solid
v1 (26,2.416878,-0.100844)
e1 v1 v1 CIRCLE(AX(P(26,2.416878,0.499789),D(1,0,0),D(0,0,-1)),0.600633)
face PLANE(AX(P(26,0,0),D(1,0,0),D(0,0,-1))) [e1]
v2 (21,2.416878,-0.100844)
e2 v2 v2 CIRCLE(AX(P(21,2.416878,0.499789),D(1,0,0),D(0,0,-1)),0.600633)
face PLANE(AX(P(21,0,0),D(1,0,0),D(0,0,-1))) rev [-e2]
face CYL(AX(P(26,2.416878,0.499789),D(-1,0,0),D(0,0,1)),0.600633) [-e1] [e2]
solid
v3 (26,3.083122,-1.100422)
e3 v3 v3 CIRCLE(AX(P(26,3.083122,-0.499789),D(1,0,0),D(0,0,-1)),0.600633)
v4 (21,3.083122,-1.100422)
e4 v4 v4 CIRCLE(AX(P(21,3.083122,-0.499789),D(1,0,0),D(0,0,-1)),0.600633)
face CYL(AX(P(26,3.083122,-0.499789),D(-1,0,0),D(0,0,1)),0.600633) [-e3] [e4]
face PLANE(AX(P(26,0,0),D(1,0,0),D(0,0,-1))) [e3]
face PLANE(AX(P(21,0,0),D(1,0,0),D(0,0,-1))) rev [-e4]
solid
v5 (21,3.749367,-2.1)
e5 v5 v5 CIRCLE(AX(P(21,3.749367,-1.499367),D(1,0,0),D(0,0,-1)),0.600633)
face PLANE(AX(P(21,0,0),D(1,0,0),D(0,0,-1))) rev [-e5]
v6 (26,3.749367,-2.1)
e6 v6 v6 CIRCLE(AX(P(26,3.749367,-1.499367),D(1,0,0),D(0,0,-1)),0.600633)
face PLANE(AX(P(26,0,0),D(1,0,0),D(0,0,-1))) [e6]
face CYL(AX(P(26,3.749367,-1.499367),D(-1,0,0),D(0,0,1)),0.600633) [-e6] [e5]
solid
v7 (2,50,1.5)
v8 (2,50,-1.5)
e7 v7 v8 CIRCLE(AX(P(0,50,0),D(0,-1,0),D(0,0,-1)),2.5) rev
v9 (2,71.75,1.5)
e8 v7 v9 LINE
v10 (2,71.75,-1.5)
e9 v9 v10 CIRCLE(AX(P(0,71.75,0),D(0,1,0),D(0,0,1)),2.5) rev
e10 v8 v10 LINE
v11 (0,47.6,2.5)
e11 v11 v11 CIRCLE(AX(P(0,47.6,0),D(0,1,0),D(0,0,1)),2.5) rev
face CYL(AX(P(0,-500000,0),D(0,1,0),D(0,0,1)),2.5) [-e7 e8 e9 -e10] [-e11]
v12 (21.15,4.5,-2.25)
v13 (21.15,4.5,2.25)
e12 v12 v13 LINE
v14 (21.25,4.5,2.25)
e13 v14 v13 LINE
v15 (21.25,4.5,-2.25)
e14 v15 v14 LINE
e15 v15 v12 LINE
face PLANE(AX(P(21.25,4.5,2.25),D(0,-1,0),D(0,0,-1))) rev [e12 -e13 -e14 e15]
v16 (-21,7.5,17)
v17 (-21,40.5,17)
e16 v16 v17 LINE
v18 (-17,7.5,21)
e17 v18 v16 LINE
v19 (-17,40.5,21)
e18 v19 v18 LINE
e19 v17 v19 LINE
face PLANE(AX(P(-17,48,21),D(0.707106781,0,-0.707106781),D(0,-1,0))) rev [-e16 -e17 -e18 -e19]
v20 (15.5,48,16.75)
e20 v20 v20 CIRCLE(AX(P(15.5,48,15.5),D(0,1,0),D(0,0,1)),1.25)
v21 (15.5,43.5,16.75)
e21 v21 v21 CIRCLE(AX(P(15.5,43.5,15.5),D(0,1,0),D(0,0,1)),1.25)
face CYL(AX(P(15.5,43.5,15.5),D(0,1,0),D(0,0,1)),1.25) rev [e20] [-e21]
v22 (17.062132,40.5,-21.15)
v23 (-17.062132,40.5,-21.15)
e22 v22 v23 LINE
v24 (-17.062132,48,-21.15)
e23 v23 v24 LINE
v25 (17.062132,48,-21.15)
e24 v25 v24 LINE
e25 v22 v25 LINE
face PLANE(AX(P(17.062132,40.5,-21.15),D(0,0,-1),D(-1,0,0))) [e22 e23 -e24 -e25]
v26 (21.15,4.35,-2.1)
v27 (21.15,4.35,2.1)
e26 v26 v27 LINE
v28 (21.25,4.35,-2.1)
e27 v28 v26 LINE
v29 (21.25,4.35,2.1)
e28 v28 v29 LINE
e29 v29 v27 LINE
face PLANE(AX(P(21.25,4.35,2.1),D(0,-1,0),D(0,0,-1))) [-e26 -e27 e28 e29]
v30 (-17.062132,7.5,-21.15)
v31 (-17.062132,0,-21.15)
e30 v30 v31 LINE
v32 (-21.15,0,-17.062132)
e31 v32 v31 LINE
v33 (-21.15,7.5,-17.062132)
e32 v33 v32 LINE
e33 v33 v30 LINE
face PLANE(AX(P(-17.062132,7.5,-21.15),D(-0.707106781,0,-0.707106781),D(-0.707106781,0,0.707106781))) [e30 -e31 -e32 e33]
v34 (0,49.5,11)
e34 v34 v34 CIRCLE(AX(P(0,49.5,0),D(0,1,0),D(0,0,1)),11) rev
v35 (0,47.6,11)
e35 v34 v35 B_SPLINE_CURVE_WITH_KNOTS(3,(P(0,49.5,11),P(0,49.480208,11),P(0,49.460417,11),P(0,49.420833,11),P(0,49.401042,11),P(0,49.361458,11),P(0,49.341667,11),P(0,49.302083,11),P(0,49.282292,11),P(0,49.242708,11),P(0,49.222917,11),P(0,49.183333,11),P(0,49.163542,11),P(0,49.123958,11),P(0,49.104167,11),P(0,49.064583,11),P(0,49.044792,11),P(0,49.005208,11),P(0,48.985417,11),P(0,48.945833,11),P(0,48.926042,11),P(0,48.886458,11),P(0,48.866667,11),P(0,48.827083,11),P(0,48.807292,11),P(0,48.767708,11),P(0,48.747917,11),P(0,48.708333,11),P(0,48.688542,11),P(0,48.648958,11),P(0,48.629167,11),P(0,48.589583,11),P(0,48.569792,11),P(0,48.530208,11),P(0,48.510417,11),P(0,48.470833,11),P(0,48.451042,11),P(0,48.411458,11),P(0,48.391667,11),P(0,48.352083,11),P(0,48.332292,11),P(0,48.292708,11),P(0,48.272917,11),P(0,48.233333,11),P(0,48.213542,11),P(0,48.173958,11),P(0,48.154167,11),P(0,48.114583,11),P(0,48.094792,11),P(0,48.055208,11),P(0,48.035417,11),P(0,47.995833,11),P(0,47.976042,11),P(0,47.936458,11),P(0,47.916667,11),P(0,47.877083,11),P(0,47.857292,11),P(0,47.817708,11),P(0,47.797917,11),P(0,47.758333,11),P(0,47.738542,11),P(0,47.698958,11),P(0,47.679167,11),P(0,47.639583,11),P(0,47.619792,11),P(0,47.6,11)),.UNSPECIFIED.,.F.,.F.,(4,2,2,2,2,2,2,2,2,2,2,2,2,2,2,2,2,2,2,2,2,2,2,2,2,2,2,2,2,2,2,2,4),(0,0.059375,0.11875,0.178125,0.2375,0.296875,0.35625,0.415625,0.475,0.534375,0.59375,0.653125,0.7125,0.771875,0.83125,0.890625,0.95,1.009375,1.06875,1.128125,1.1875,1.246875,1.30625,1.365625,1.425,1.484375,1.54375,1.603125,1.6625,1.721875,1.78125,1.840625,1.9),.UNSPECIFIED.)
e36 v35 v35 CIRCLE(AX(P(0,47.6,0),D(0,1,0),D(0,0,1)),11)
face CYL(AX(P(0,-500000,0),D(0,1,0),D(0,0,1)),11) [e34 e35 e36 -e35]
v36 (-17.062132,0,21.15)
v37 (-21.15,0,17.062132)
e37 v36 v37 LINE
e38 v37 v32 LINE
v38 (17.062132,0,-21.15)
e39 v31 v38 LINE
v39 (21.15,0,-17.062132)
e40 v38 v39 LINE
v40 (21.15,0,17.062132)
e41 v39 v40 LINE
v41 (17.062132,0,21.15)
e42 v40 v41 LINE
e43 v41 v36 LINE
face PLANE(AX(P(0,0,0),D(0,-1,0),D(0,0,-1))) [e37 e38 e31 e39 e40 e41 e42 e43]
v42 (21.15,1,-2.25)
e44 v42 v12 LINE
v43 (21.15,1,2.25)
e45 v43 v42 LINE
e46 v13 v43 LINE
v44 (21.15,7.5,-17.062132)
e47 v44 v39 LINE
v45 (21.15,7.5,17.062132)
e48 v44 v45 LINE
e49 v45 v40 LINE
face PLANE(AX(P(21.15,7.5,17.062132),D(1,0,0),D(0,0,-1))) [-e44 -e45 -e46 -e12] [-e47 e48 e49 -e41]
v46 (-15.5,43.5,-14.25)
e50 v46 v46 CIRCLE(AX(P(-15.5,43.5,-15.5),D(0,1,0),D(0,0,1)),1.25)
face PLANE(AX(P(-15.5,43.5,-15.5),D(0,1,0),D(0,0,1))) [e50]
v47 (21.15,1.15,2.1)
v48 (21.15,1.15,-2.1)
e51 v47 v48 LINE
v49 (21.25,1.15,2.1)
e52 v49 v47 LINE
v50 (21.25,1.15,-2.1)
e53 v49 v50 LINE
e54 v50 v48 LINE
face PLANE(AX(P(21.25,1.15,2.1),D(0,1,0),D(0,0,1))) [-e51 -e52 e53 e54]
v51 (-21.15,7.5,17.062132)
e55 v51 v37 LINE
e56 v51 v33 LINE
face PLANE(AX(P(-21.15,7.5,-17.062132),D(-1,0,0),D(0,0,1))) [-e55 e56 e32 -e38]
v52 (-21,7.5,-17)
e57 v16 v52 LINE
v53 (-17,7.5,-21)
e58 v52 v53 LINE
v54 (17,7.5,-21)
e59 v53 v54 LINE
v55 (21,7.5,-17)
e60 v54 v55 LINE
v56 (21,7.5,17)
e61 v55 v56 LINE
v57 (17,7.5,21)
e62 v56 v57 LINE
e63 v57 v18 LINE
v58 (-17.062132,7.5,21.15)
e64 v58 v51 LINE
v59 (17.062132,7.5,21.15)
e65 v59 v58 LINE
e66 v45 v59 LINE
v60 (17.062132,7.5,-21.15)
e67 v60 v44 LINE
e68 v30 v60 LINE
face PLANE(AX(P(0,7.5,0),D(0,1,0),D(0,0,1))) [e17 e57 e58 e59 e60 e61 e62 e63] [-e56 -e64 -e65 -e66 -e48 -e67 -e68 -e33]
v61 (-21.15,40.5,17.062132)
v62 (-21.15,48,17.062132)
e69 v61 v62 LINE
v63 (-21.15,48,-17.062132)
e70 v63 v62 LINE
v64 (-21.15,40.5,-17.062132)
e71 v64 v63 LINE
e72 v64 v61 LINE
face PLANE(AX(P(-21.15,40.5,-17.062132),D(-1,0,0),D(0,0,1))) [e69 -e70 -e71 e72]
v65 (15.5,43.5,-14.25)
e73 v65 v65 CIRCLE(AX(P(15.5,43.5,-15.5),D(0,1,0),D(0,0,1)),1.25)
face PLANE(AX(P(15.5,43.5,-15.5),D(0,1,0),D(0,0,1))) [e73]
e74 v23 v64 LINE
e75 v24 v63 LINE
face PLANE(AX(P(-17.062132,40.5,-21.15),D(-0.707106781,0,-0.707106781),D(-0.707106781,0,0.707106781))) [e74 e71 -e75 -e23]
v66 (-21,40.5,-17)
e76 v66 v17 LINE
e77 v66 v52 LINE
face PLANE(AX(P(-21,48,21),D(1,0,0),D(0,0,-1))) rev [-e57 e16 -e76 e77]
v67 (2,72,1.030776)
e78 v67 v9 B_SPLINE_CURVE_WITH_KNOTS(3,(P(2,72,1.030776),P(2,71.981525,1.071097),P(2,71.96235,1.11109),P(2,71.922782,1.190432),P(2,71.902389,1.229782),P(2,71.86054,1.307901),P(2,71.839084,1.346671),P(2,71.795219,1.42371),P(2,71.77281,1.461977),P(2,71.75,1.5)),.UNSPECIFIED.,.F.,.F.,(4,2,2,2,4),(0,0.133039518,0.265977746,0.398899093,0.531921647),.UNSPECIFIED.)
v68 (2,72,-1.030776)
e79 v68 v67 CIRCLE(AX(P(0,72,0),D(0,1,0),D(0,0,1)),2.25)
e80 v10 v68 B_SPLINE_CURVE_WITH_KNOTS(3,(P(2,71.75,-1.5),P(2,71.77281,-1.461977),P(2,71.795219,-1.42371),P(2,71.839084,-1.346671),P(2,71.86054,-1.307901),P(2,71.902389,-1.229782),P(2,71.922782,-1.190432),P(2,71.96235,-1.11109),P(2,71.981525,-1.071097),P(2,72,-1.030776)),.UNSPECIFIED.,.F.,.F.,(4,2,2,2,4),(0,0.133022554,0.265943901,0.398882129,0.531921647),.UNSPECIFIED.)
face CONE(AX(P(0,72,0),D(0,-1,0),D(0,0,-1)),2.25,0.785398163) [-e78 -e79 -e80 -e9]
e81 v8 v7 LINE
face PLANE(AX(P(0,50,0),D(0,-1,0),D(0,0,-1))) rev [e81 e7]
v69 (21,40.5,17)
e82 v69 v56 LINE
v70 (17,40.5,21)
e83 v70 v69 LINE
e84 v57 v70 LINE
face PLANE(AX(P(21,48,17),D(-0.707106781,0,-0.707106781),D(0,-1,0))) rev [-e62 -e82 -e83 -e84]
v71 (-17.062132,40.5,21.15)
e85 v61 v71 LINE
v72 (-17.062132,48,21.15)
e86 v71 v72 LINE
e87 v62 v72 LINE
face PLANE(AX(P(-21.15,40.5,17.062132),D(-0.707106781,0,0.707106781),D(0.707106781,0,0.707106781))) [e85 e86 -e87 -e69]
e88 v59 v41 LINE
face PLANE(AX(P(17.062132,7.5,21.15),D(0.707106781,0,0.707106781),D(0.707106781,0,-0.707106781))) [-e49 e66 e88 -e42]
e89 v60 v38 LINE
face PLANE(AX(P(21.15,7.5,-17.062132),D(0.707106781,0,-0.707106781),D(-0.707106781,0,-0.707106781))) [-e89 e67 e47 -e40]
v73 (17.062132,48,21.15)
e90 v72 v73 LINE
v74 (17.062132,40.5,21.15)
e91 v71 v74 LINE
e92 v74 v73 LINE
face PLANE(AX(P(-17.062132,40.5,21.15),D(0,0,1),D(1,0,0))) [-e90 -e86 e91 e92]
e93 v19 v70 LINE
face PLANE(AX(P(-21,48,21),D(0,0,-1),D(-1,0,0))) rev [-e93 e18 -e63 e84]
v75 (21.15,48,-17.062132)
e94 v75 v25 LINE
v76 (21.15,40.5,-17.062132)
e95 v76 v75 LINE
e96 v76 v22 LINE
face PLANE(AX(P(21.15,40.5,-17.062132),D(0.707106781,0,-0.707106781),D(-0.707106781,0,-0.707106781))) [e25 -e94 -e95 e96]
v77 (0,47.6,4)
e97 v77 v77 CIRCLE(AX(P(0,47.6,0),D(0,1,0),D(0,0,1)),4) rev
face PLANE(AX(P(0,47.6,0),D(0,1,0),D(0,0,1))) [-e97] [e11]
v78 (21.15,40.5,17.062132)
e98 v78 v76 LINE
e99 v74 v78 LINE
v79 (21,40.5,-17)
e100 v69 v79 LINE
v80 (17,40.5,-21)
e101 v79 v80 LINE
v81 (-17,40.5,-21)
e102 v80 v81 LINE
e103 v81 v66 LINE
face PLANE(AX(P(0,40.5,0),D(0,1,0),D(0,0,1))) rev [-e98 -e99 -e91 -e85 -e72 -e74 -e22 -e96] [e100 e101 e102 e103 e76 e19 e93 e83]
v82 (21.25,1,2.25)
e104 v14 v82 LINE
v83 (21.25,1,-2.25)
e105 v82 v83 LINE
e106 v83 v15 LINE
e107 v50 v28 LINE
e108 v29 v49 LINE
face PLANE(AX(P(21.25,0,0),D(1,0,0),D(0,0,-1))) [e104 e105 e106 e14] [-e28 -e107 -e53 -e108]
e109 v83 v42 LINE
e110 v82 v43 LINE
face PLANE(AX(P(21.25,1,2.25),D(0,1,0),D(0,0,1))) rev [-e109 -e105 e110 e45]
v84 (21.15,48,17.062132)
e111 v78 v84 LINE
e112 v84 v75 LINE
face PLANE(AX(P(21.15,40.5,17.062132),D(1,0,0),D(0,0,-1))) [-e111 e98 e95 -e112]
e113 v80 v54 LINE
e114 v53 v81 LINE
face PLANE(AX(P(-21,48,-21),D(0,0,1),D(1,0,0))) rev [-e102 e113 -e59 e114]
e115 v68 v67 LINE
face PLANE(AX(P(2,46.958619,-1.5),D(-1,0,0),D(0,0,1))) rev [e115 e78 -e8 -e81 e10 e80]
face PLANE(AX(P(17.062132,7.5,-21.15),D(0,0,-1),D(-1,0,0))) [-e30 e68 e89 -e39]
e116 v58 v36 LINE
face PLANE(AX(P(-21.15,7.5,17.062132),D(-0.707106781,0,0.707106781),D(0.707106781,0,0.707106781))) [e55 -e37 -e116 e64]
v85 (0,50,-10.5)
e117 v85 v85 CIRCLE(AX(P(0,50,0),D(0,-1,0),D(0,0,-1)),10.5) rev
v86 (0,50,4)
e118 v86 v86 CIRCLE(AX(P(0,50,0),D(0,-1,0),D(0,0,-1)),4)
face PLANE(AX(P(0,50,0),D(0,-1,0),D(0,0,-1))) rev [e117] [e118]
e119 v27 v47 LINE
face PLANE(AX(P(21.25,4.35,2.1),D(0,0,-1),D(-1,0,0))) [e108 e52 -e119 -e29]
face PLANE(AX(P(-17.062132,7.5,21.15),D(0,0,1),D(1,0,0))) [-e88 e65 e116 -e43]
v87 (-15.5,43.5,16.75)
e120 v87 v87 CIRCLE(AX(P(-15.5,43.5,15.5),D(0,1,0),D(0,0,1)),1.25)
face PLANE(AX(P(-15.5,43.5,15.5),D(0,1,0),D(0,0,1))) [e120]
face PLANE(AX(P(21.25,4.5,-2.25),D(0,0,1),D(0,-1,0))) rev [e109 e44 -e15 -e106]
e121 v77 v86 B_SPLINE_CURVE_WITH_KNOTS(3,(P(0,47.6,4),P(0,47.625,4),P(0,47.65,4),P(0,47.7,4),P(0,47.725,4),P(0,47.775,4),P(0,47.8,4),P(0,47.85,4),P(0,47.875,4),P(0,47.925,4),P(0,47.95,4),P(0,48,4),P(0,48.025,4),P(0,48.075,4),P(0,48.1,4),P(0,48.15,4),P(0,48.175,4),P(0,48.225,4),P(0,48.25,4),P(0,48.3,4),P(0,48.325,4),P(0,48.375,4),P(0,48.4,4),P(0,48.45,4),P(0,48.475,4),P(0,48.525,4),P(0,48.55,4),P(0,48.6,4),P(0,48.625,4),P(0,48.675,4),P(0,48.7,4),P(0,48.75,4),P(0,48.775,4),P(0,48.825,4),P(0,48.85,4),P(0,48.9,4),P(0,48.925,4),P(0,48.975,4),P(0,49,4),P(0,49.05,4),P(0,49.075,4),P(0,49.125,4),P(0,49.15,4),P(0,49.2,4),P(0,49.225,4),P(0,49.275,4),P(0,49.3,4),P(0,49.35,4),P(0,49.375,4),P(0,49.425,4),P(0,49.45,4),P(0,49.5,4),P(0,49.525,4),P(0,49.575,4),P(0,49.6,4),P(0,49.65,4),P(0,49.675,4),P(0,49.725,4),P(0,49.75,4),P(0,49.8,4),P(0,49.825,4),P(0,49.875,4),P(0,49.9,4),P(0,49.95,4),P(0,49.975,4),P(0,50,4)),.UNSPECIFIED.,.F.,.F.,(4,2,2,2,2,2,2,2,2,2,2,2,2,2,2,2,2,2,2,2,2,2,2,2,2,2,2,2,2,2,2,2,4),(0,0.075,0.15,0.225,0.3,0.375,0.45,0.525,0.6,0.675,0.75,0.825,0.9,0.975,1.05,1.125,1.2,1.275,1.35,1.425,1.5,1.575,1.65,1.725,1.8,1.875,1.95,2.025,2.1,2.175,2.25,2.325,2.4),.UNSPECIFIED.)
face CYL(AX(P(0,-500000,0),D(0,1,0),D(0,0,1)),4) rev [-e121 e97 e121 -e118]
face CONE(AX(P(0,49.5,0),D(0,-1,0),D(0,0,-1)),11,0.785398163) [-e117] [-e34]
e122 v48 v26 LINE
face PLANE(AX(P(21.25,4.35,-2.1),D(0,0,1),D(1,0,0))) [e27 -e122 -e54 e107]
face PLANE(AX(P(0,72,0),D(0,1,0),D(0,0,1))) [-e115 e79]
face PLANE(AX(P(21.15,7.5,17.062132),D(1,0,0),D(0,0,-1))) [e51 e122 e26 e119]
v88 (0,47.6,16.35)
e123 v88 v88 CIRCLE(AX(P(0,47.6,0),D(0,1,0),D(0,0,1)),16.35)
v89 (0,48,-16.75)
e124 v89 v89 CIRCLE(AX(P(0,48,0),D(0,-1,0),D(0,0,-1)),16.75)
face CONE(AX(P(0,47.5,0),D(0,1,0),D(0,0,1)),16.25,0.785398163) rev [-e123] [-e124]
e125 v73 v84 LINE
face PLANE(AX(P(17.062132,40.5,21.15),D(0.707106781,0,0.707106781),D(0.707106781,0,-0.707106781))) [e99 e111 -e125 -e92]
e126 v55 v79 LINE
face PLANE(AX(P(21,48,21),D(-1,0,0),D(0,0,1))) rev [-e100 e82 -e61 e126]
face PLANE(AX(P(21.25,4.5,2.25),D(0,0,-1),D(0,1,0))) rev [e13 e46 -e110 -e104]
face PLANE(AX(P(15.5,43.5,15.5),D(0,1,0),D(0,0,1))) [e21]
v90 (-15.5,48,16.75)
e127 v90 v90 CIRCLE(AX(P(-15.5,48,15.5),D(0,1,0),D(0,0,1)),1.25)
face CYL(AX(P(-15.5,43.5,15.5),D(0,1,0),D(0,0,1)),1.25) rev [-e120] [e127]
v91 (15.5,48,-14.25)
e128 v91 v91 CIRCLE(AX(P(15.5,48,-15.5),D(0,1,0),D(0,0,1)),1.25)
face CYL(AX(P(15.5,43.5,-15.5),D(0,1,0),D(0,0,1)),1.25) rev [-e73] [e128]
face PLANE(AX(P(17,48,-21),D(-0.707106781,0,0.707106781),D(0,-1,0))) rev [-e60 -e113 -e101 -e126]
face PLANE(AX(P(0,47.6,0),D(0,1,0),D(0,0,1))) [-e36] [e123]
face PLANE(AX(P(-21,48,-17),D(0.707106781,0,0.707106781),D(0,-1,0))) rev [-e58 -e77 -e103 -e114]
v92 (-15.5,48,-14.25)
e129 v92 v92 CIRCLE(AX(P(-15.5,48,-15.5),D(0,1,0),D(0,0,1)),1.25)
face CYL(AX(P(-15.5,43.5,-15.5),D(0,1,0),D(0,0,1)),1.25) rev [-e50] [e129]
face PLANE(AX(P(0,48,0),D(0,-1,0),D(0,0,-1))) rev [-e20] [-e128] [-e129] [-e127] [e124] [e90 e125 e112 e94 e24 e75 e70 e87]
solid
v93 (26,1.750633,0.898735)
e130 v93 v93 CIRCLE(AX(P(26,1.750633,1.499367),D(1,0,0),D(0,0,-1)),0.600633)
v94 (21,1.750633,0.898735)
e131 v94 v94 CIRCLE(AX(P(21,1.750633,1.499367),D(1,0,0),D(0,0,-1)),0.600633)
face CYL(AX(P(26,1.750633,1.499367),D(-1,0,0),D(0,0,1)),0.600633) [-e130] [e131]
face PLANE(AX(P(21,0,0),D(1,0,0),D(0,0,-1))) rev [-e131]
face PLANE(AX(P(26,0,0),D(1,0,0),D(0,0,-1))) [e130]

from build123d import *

# Parameters (mm, degrees)
CROQUIS1_W                          = 42
CROQUIS1_H                          = 42
SALIENTE_EXTRUIR1_DEPTH             = 48
CHAFL_N1_SIZE                       = 4
CROQUIS3_R                          = 16.25
CORTAR_EXTRUIR1_DEPTH               = 0.4
SALIENTE_EXTRUIR2_REACH             = 60.155
CROQUIS4_R                          = 11
CROQUIS4_R_2                        = 4
CHAFL_N2_SIZE                       = 0.5
CROQUIS5_R                          = 2.5
SALIENTE_EXTRUIR3_DEPTH             = 22
SALIENTE_EXTRUIR3_DIRECTION_2_REACH = 60.155
CORTAR_EXTRUIR2_DEPTH               = 22
CHAFL_N3_SIZE                       = 0.25
SALIENTE_EXTRUIR9_DEPTH             = 7.5
SALIENTE_EXTRUIR10_DEPTH            = 7.5
CROQUIS7_R                          = 1.25
CORTAR_EXTRUIR3_DEPTH               = 4.5
CROQUIS10_W                         = 4.5
CROQUIS10_H                         = 3.5
CROQUIS10_W_2                       = 4.2
CROQUIS10_H_2                       = 3.2
SALIENTE_EXTRUIR7_DEPTH             = 0.1
CROQUIS11_R                         = 0.600632734
SALIENTE_EXTRUIR8_DEPTH             = 5
SALIENTE_EXTRUIR8_2_DEPTH           = 5
SALIENTE_EXTRUIR8_3_DEPTH           = 5
SALIENTE_EXTRUIR8_4_DEPTH           = 5


with BuildPart() as part:
    # Croquis1 → Saliente-Extruir1 (new body)
    with BuildSketch(Plane(origin=(0, 0, 0), x_dir=(1, 0, 0), z_dir=(0, 1, 0))):
        Rectangle(CROQUIS1_W, CROQUIS1_H)
    extrude(amount=SALIENTE_EXTRUIR1_DEPTH)

    # Chaflán1
    chafl_n1_edges = [part.edges().sort_by_distance(p)[0] for p in [
        (-21, 24, -21),
        (21, 24, -21),
        (21, 24, 21),
        (-21, 24, 21),
    ]]
    chamfer(chafl_n1_edges, length=CHAFL_N1_SIZE)

    # Croquis3 → Cortar-Extruir1 (cut)
    with BuildSketch(Plane(origin=(0, 48, 0), x_dir=(1, 0, 0), z_dir=(0, 1, 0))):
        with Locations(Location((0, 0, 0), (0, 0, 270))):
            Circle(CROQUIS3_R)
    extrude(amount=-CORTAR_EXTRUIR1_DEPTH, mode=Mode.SUBTRACT)

    # Croquis4 → Saliente-Extruir2 (add, up to next)
    with BuildSketch(Plane(origin=(0, 50, 0), x_dir=(-1, 0, 0), z_dir=(0, -1, 0)), mode=Mode.PRIVATE) as saliente_extruir2_sk1:
        with Locations(Location((0, 0, 0), (0, 0, 270))):
            Circle(CROQUIS4_R)
        with Locations(Location((0, 0, 0), (0, 0, 270))):
            Circle(CROQUIS4_R_2, mode=Mode.SUBTRACT)
    saliente_extruir2_tool1 = extrude(saliente_extruir2_sk1.sketch, amount=SALIENTE_EXTRUIR2_REACH, mode=Mode.PRIVATE) - part.part
    add(saliente_extruir2_tool1.solids().sort_by_distance((0, 50, -10.688873))[0])

    # Chaflán2
    # the kernel refuses this chamfer: 0.5 mm, written as the material it takes off along each edge
    with BuildSketch(Plane(origin=(0, 48, 0), x_dir=(0, 0, 1), z_dir=(-1, 0, 0))) as chafl_n2_piece_1_section:
        Polygon((16.25 + CHAFL_N2_SIZE, 0), (16.25, -CHAFL_N2_SIZE), (16.25, 0), align=None)
    chafl_n2_piece_1 = revolve(axis=Axis((0, 48, 0), (0, 1, 0)), mode=Mode.PRIVATE)
    chafl_n2_piece_1 = split(chafl_n2_piece_1, bisect_by=Plane(origin=(0, 47.6, -16.540253215), z_dir=(0, 1, 0)), keep=Keep.TOP, mode=Mode.PRIVATE)
    add(chafl_n2_piece_1, mode=Mode.SUBTRACT)
    with BuildSketch(Plane(origin=(0, 50, 0), x_dir=(0, 0, 1), z_dir=(1, 0, 0))) as chafl_n2_piece_2:
        Polygon((11, CHAFL_N2_SIZE), (11 - CHAFL_N2_SIZE, 0), (11, 0), align=None)
    revolve(axis=Axis((0, 50, 0), (0, -1, 0)), mode=Mode.SUBTRACT)


with BuildPart() as body_2:
    # Croquis5 → Saliente-Extruir3 (new body)
    with BuildSketch(Plane(origin=(0, 50, 0), x_dir=(1, 0, 0), z_dir=(0, 1, 0))):
        with Locations(Location((0, 0, 0), (0, 0, 270))):
            Circle(CROQUIS5_R)
    extrude(amount=SALIENTE_EXTRUIR3_DEPTH)


    # Croquis5 → Saliente-Extruir3 direction 2 (add, up to next)
    with BuildSketch(Plane(origin=(0, 50, 0), x_dir=(1, 0, 0), z_dir=(0, 1, 0)), mode=Mode.PRIVATE) as saliente_extruir3_direction_2_sk1:
        with Locations(Location((0, 0, 0), (0, 0, 270))):
            Circle(CROQUIS5_R)
    saliente_extruir3_direction_2_tool1 = extrude(saliente_extruir3_direction_2_sk1.sketch, amount=-SALIENTE_EXTRUIR3_DIRECTION_2_REACH, mode=Mode.PRIVATE) - part.part
    add(saliente_extruir3_direction_2_tool1.solids().sort_by_distance((0, 50, 0))[0])

    # Croquis6 → Cortar-Extruir2 (cut)
    with BuildSketch(Plane(origin=(0, 72, 0), x_dir=(1, 0, 0), z_dir=(0, 1, 0))):
        with BuildLine():
            Line((2, 1.5), (2, -1.5))
            ThreePointArc((2, -1.5), (2.5, 0), (2, 1.5))
        make_face()
    extrude(amount=-CORTAR_EXTRUIR2_DEPTH, mode=Mode.SUBTRACT)

    # Chaflán3
    chafl_n3_edges = [body_2.edges().sort_by_distance(p)[0] for p in [
        (-2.236067977, 72, -1.118033989),
    ]]
    chamfer(chafl_n3_edges, length=CHAFL_N3_SIZE)


    add(part.part)  # Saliente-Extruir9 merges part
    # Croquis12 → Saliente-Extruir9 (add)
    with BuildSketch(Plane(origin=(0, 48, 0), x_dir=(1, 0, 0), z_dir=(0, 1, 0))):
        Polygon((-17.062132034, 21.15), (-21.15, 17.062132034), (-21.15, -17.062132034), (-17.062132034, -21.15), (17.062132034, -21.15), (21.15, -17.062132034), (21.15, 17.062132034), (17.062132034, 21.15), align=None)
        Polygon((-17, 21), (-21, 17), (-21, -17), (-17, -21), (17, -21), (21, -17), (21, 17), (17, 21), align=None, mode=Mode.SUBTRACT)
    extrude(amount=-SALIENTE_EXTRUIR9_DEPTH)

    # Croquis13 → Saliente-Extruir10 (add)
    with BuildSketch(Plane.XZ):
        Polygon((-17.062132034, -21.15), (-21.15, -17.062132034), (-21.15, 17.062132034), (-17.062132034, 21.15), (17.062132034, 21.15), (21.15, 17.062132034), (21.15, -17.062132034), (17.062132034, -21.15), align=None)
        Polygon((-17, -21), (-21, -17), (-21, 17), (-17, 21), (17, 21), (21, 17), (21, -17), (17, -21), align=None, mode=Mode.SUBTRACT)
    extrude(amount=-SALIENTE_EXTRUIR10_DEPTH)

    # Croquis7 → Cortar-Extruir3 (cut)
    with BuildSketch(Plane(origin=(0, 48, 0), x_dir=(1, 0, 0), z_dir=(0, 1, 0))):
        with Locations(Location((-15.5, 15.5, 0), (0, 0, 270))):
            Circle(CROQUIS7_R)
        with Locations(Location((15.5, 15.5, 0), (0, 0, 270))):
            Circle(CROQUIS7_R)
        with Locations(Location((15.5, -15.5, 0), (0, 0, 270))):
            Circle(CROQUIS7_R)
        with Locations(Location((-15.5, -15.5, 0), (0, 0, 270))):
            Circle(CROQUIS7_R)
    extrude(amount=-CORTAR_EXTRUIR3_DEPTH, mode=Mode.SUBTRACT)

    # Croquis10 → Saliente-Extruir7 (add)
    with BuildSketch(Plane(origin=(21.15, 0, 0), x_dir=(0, 0, -1), z_dir=(1, 0, 0))):
        with Locations((0, 2.75)):
            Rectangle(CROQUIS10_W, CROQUIS10_H)
        with Locations((0, 2.75)):
            Rectangle(CROQUIS10_W_2, CROQUIS10_H_2, mode=Mode.SUBTRACT)
    extrude(amount=SALIENTE_EXTRUIR7_DEPTH)


with BuildPart() as body_2_2:
    # Croquis11 → Saliente-Extruir8 (new body)
    with BuildSketch(Plane(origin=(21, 0, 0), x_dir=(0, 0, -1), z_dir=(1, 0, 0))):
        with Locations((-1.499367266, 1.750632734)):
            Circle(CROQUIS11_R)
    extrude(amount=SALIENTE_EXTRUIR8_DEPTH)


with BuildPart() as body_3:
    # Croquis11 → Saliente-Extruir8 2 (new body)
    with BuildSketch(Plane(origin=(21, 0, 0), x_dir=(0, 0, -1), z_dir=(1, 0, 0))):
        with Locations((-0.499789089, 2.416877578)):
            Circle(CROQUIS11_R)
    extrude(amount=SALIENTE_EXTRUIR8_2_DEPTH)


with BuildPart() as body_4:
    # Croquis11 → Saliente-Extruir8 3 (new body)
    with BuildSketch(Plane(origin=(21, 0, 0), x_dir=(0, 0, -1), z_dir=(1, 0, 0))):
        with Locations((0.499789089, 3.083122422)):
            Circle(CROQUIS11_R)
    extrude(amount=SALIENTE_EXTRUIR8_3_DEPTH)


with BuildPart() as body_5:
    # Croquis11 → Saliente-Extruir8 4 (new body)
    with BuildSketch(Plane(origin=(21, 0, 0), x_dir=(0, 0, -1), z_dir=(1, 0, 0))):
        with Locations((1.499367266, 3.749367266)):
            Circle(CROQUIS11_R)
    extrude(amount=SALIENTE_EXTRUIR8_4_DEPTH)


solid = Compound([body_2.part, body_2_2.part, body_3.part, body_4.part, body_5.part])
